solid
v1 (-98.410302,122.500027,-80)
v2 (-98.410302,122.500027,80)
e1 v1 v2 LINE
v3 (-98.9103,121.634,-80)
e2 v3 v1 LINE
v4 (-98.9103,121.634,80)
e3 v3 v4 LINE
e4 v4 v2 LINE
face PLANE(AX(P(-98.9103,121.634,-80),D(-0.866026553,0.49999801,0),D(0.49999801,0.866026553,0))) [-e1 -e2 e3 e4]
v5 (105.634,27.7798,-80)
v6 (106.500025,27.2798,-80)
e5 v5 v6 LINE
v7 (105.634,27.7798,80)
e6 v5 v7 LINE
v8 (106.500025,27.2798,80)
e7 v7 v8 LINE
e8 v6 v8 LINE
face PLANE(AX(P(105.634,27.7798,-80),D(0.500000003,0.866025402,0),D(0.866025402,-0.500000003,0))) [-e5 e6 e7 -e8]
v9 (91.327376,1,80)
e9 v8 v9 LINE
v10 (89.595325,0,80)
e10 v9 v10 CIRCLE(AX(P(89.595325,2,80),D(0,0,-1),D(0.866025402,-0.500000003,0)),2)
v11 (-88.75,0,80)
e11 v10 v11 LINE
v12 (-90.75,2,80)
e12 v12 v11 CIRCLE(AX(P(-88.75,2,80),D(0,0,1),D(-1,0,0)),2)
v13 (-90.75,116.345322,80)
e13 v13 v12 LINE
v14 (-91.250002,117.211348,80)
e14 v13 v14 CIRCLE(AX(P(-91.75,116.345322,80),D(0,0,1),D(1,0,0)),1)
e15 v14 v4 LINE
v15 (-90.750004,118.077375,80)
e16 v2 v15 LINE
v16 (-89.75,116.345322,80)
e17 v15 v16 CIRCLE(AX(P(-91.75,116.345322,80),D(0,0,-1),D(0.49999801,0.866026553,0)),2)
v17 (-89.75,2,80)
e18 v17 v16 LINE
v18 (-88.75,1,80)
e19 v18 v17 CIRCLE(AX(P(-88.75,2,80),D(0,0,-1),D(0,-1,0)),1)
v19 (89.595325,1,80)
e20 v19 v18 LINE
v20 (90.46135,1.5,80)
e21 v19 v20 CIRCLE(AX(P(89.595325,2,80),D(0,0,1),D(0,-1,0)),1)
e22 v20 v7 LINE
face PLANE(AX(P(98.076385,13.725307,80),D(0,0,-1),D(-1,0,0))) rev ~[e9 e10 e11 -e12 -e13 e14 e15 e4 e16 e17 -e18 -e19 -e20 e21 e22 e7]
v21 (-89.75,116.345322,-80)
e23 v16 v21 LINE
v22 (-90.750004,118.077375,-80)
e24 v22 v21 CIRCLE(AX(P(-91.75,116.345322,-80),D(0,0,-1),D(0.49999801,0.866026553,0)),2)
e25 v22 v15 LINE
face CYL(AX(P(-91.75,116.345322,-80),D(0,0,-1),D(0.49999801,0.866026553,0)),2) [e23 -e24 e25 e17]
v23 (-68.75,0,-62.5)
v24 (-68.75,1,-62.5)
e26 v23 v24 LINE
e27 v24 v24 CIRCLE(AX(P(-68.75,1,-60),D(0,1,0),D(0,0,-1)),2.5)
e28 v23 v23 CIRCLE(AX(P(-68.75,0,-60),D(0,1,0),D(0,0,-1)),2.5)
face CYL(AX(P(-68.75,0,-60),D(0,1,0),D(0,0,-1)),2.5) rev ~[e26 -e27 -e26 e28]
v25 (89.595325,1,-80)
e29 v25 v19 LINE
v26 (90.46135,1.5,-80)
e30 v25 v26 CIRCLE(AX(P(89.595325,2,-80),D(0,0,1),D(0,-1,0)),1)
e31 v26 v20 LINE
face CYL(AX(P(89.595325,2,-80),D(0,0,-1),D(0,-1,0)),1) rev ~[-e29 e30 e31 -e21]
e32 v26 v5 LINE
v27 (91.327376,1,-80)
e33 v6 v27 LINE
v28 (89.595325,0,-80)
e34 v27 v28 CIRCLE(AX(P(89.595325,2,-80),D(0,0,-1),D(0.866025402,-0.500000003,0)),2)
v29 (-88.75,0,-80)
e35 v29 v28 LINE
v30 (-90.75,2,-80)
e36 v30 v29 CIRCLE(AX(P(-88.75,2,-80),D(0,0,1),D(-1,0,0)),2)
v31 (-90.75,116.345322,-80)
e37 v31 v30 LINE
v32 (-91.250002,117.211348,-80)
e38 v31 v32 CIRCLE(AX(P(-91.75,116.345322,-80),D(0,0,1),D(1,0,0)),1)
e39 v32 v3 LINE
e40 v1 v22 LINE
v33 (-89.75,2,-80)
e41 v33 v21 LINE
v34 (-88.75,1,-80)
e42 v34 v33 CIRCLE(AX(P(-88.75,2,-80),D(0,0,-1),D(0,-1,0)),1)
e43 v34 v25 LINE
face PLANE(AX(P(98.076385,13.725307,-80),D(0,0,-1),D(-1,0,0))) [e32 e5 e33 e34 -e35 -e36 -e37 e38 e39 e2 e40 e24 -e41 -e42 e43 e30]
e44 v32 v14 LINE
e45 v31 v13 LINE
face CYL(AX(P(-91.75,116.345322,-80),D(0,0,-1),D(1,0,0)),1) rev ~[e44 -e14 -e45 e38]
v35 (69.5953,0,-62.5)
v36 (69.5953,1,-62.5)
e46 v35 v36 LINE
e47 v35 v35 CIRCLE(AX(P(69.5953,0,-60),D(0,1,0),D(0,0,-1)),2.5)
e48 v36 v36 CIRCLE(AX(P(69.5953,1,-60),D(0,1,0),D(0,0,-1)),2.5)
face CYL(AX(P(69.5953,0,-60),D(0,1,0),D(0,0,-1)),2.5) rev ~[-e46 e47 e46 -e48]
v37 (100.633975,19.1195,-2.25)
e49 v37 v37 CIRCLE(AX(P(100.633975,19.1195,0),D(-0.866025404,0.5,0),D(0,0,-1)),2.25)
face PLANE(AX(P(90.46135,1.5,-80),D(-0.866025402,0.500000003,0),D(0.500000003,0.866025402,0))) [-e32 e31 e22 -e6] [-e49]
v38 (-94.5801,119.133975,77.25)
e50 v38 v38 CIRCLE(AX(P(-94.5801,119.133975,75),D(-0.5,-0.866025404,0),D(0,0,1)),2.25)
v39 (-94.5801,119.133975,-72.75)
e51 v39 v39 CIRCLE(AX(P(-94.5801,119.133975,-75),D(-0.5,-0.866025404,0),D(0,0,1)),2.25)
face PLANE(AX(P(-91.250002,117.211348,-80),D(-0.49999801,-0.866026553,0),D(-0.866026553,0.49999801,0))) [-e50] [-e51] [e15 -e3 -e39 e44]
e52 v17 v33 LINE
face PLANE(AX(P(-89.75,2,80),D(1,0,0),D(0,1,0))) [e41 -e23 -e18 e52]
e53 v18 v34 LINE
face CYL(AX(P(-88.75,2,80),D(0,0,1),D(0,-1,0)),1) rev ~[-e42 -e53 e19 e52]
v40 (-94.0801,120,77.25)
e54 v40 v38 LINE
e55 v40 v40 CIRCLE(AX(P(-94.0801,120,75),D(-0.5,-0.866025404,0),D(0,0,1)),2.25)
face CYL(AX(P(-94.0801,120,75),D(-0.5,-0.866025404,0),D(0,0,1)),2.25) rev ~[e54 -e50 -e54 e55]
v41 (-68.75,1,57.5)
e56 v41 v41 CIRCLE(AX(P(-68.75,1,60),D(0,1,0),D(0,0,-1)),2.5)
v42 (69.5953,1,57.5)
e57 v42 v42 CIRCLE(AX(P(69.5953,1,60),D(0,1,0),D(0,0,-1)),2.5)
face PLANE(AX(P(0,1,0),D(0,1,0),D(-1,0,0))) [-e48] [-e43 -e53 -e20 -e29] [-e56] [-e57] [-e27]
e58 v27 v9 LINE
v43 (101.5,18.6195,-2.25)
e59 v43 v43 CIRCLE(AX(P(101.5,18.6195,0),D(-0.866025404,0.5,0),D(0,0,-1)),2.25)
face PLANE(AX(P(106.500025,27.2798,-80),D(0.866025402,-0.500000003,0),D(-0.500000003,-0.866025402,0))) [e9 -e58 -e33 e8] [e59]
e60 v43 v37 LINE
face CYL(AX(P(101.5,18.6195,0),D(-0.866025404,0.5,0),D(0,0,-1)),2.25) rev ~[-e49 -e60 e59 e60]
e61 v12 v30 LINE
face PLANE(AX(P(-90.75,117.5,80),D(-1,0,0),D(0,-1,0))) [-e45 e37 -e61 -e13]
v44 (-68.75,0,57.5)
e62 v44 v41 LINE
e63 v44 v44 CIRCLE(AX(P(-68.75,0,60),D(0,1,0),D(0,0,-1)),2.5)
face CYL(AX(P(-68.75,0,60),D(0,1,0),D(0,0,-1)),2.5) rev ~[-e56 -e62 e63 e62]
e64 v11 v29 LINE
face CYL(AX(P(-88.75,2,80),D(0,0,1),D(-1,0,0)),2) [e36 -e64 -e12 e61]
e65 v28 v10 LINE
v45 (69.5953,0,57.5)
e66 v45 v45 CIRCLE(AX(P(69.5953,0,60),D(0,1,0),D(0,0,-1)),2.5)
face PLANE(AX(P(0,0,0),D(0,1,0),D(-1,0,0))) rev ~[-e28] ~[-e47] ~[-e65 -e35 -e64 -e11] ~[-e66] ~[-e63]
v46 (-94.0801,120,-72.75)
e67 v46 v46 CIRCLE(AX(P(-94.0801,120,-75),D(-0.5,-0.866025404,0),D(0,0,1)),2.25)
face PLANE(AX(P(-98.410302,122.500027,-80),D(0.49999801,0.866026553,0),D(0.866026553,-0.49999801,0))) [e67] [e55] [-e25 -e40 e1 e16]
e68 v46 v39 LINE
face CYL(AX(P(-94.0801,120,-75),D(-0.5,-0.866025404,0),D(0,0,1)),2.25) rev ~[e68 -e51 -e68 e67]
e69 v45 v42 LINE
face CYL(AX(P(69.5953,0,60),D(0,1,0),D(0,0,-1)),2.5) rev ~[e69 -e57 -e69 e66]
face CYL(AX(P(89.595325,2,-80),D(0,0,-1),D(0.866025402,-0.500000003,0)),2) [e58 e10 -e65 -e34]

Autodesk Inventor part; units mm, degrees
ref_plane "YZ Plane" through (0, 0, 0) normal (1, 0, 0) x (0, 1, 0)
ref_plane "XZ Plane" through (0, 0, 0) normal (0, 1, 0) x (-1, 0, 0)
ref_plane "XY Plane" through (0, 0, 0) normal (0, 0, 1) x (1, 0, 0)
sketch "Sketch1" plane through (0, 0, 0) normal (0, 1, 0) x (-1, 0, 0)
  line L0 (-90.75, 80) -> (90.75, 80)
  line L1 (90.75, 80) -> (90.75, -80)
  line L2 (90.75, -80) -> (-90.75, -80)
  line L3 (-90.75, -80) -> (-90.75, 80)
  line L4 (-90.75, 80) -> (90.75, -80) construction
  line L5 (90.75, 80) -> (-90.75, -80) construction
  point P0 (0, 0)
  dimension "d0" = 181.5
  dimension "d1" = 160
extrude "Extrusion1" add sketch "Sketch1" along normal blind 1
sketch "Sketch2" plane through (-89.75, 0, 80) normal (-1, 0, 0) x (0, -1, 0)
  line L0 (0, -160) -> (0, 0)
  line L1 (0, 0) -> (-117.5, 0)
  line L2 (-117.5, 0) -> (-117.5, -160)
  line L3 (-117.5, -160) -> (0, -160)
edge flange "Flange1" height 117.5 angle 90 thickness 1 bend radius 1 thickness toward (-1, 0, 0) relief tear relief width 1 relief depth 0.5 edges at (-90.75, 1, 0) wall of the first edge with corners at (-89.75, 0, -80) (-89.75, 0, 80) (-89.75, 117.5, 80) (-89.75, 117.5, -80)
bend "Bend1"
corner "Corner1"
sketch "Sketch3" plane through (-90.25, 116.634, 80) normal (0.5, 0.8660254, 0) x (0.8660254, -0.5, 0)
  line L0 (0, -160) -> (0, 0)
  line L1 (0, 0) -> (-10, 0)
  line L2 (-10, 0) -> (-10, -160)
  line L3 (-10, -160) -> (0, -160)
edge flange "Flange2" height 10 angle -60 thickness 1 bend radius 1 thickness toward (0.5, 0.8660254, 0) relief tear relief width 1 relief depth 0.5 edges at (-89.75, 117.5, 0) wall of the first edge with corners at (-90.25, 116.634, -80) (-90.25, 116.634, 80) (-98.9103, 121.634, 80) (-98.9103, 121.634, -80)
bend "Bend2"
corner "Corner2"
sketch "Sketch4" plane through (-98.4103, 122.5, 80) normal (0.5, 0.8660254, 0) x (0, 0, -1)
  line L0 (160, 0) -> (0, 0) projected
  line L1 (80, 0) -> (80, -5)
  line L2 (80, 0) -> (85, 0) construction
  line L3 (80, -5) -> (155, -5)
  line L4 (80, -5) -> (155, -5) construction
  line L5 (80, -5) -> (5, -5)
  line L6 (80, -5) -> (155, -5) construction
  point P0 (80, -146.4758)
  dimension "d25" = 5
  dimension "d26" = 90
  dimension "d27" = 75
  dimension "d28" = 0
  dimension "d29" = 75
  dimension "d30" = 180
hole "Hole1" at (-94.0801, 120, 75) at (-94.0801, 120, -75) direction (-0.5, -0.8660254, 0) diameter 4.5 depth 1 tip angle 118
sketch "Sketch5" plane through (89.884, 0.5, -80) normal (0.8660254, -0.5, 0) x (0.5, 0.8660254, 0)
  line L0 (0, 160) -> (0, 0)
  line L1 (0, 0) -> (31.5, 0)
  line L2 (31.5, 0) -> (31.5, 160)
  line L3 (31.5, 160) -> (0, 160)
edge flange "Flange3" height 31.5 angle 60 thickness 1 bend radius 1 thickness toward (0.8660254, -0.5, 0) relief tear relief width 1 relief depth 0.5 edges at (90.75, 1, 0) wall of the first edge with corners at (89.884, 0.5, 80) (89.884, 0.5, -80) (105.634, 27.7798, -80) (105.634, 27.7798, 80)
bend "Bend3"
corner "Corner3"
sketch "Sketch6" plane through (106.5, 27.2798, 80) normal (0.8660254, -0.5, 0) x (0, 0, -1)
  line L0 (0, 0) -> (160, 0) projected
  line L1 (80, 0) -> (80, -10)
  line L2 (80, 0) -> (90, 0) construction
  point P0 (80, -76.875)
  dimension "d48" = 10
  dimension "d49" = 90
hole "Hole3" at (101.5, 18.6195, 0) direction (-0.8660254, 0.5, 0) diameter 4.5 depth 1 tip angle 118
sketch "Sketch7" plane through (0, 0, 0) normal (0, -1, 0) x (1, 0, 0)
  line L0 (89.5953, -80) -> (89.5953, 80) projected
  line L1 (-88.75, 80) -> (89.5953, 80) projected
  line L2 (-88.75, 80) -> (-88.75, -80) projected
  line L3 (89.5953, -80) -> (-88.75, -80) projected
  line L4 (-88.75, 80) -> (-68.75, 80)
  line L5 (-88.75, 80) -> (89.5953, 80) projected
  line L6 (-68.75, 80) -> (-68.75, 60)
  line L7 (-88.75, 0) -> (89.5953, 0)
  line L8 (0.4226, 80) -> (0.4226, -80)
  point P0 (0, 0)
  point P1 (-68.75, -60)
  point P2 (69.5953, 60)
  point P3 (69.5953, -60)
  dimension "d67" = 20
  dimension "d68" = 20
hole "Hole4" at (69.5953, 0, -60) at (-68.75, 0, -60) at (-68.75, 0, 60) at (69.5953, 0, 60) direction (0, 1, 0) diameter 5 depth 1 tip angle 118
equation "\"d36\" = Thickness"
equation "\"d65\" = Thickness"
equation "\"d74\" = Thickness"
equation "\"d4\" = Thickness"
equation "\"d5\" = BendReliefWidth"
equation "\"d6\" = BendReliefDepth"
equation "\"d7\" = MinimumRemnant"
equation "\"d8\" = TransitionRadius"
equation "\"d11\" = BendRadius"
equation "\"d12\" = CornerReliefSize"
equation "\"d13\" = GapSize"
equation "\"d14\" = JacobiRadiusSize"
equation "\"d15\" = BendReliefWidth"
equation "\"d16\" = BendReliefDepth"
equation "\"d17\" = MinimumRemnant"
equation "\"d18\" = TransitionRadius"
equation "\"d21\" = BendRadius"
equation "\"d22\" = CornerReliefSize"
equation "\"d23\" = GapSize"
equation "\"d24\" = JacobiRadiusSize"
equation "\"d38\" = BendReliefWidth"
equation "\"d39\" = BendReliefDepth"
equation "\"d40\" = MinimumRemnant"
equation "\"d41\" = TransitionRadius"
equation "\"d44\" = BendRadius"
equation "\"d45\" = CornerReliefSize"
equation "\"d46\" = GapSize"
equation "\"d47\" = JacobiRadiusSize"
equation "\"BendRadius\" = Thickness"
equation "\"BendReliefWidth\" = Thickness"
equation "\"BendReliefDepth\" = 0.5 * Thickness"
equation "\"CornerReliefSize\" = 4 * Thickness"
equation "\"MinimumRemnant\" = 2 * Thickness"
equation "\"TransitionRadius\" = BendRadius"
equation "\"JacobiRadiusSize\" = BendRadius"
equation "\"GapSize\" = Thickness"
equation "\"Thickness\" = 1"
properties part number "zetdeel_hoog" material "Steel, Galvanized"
